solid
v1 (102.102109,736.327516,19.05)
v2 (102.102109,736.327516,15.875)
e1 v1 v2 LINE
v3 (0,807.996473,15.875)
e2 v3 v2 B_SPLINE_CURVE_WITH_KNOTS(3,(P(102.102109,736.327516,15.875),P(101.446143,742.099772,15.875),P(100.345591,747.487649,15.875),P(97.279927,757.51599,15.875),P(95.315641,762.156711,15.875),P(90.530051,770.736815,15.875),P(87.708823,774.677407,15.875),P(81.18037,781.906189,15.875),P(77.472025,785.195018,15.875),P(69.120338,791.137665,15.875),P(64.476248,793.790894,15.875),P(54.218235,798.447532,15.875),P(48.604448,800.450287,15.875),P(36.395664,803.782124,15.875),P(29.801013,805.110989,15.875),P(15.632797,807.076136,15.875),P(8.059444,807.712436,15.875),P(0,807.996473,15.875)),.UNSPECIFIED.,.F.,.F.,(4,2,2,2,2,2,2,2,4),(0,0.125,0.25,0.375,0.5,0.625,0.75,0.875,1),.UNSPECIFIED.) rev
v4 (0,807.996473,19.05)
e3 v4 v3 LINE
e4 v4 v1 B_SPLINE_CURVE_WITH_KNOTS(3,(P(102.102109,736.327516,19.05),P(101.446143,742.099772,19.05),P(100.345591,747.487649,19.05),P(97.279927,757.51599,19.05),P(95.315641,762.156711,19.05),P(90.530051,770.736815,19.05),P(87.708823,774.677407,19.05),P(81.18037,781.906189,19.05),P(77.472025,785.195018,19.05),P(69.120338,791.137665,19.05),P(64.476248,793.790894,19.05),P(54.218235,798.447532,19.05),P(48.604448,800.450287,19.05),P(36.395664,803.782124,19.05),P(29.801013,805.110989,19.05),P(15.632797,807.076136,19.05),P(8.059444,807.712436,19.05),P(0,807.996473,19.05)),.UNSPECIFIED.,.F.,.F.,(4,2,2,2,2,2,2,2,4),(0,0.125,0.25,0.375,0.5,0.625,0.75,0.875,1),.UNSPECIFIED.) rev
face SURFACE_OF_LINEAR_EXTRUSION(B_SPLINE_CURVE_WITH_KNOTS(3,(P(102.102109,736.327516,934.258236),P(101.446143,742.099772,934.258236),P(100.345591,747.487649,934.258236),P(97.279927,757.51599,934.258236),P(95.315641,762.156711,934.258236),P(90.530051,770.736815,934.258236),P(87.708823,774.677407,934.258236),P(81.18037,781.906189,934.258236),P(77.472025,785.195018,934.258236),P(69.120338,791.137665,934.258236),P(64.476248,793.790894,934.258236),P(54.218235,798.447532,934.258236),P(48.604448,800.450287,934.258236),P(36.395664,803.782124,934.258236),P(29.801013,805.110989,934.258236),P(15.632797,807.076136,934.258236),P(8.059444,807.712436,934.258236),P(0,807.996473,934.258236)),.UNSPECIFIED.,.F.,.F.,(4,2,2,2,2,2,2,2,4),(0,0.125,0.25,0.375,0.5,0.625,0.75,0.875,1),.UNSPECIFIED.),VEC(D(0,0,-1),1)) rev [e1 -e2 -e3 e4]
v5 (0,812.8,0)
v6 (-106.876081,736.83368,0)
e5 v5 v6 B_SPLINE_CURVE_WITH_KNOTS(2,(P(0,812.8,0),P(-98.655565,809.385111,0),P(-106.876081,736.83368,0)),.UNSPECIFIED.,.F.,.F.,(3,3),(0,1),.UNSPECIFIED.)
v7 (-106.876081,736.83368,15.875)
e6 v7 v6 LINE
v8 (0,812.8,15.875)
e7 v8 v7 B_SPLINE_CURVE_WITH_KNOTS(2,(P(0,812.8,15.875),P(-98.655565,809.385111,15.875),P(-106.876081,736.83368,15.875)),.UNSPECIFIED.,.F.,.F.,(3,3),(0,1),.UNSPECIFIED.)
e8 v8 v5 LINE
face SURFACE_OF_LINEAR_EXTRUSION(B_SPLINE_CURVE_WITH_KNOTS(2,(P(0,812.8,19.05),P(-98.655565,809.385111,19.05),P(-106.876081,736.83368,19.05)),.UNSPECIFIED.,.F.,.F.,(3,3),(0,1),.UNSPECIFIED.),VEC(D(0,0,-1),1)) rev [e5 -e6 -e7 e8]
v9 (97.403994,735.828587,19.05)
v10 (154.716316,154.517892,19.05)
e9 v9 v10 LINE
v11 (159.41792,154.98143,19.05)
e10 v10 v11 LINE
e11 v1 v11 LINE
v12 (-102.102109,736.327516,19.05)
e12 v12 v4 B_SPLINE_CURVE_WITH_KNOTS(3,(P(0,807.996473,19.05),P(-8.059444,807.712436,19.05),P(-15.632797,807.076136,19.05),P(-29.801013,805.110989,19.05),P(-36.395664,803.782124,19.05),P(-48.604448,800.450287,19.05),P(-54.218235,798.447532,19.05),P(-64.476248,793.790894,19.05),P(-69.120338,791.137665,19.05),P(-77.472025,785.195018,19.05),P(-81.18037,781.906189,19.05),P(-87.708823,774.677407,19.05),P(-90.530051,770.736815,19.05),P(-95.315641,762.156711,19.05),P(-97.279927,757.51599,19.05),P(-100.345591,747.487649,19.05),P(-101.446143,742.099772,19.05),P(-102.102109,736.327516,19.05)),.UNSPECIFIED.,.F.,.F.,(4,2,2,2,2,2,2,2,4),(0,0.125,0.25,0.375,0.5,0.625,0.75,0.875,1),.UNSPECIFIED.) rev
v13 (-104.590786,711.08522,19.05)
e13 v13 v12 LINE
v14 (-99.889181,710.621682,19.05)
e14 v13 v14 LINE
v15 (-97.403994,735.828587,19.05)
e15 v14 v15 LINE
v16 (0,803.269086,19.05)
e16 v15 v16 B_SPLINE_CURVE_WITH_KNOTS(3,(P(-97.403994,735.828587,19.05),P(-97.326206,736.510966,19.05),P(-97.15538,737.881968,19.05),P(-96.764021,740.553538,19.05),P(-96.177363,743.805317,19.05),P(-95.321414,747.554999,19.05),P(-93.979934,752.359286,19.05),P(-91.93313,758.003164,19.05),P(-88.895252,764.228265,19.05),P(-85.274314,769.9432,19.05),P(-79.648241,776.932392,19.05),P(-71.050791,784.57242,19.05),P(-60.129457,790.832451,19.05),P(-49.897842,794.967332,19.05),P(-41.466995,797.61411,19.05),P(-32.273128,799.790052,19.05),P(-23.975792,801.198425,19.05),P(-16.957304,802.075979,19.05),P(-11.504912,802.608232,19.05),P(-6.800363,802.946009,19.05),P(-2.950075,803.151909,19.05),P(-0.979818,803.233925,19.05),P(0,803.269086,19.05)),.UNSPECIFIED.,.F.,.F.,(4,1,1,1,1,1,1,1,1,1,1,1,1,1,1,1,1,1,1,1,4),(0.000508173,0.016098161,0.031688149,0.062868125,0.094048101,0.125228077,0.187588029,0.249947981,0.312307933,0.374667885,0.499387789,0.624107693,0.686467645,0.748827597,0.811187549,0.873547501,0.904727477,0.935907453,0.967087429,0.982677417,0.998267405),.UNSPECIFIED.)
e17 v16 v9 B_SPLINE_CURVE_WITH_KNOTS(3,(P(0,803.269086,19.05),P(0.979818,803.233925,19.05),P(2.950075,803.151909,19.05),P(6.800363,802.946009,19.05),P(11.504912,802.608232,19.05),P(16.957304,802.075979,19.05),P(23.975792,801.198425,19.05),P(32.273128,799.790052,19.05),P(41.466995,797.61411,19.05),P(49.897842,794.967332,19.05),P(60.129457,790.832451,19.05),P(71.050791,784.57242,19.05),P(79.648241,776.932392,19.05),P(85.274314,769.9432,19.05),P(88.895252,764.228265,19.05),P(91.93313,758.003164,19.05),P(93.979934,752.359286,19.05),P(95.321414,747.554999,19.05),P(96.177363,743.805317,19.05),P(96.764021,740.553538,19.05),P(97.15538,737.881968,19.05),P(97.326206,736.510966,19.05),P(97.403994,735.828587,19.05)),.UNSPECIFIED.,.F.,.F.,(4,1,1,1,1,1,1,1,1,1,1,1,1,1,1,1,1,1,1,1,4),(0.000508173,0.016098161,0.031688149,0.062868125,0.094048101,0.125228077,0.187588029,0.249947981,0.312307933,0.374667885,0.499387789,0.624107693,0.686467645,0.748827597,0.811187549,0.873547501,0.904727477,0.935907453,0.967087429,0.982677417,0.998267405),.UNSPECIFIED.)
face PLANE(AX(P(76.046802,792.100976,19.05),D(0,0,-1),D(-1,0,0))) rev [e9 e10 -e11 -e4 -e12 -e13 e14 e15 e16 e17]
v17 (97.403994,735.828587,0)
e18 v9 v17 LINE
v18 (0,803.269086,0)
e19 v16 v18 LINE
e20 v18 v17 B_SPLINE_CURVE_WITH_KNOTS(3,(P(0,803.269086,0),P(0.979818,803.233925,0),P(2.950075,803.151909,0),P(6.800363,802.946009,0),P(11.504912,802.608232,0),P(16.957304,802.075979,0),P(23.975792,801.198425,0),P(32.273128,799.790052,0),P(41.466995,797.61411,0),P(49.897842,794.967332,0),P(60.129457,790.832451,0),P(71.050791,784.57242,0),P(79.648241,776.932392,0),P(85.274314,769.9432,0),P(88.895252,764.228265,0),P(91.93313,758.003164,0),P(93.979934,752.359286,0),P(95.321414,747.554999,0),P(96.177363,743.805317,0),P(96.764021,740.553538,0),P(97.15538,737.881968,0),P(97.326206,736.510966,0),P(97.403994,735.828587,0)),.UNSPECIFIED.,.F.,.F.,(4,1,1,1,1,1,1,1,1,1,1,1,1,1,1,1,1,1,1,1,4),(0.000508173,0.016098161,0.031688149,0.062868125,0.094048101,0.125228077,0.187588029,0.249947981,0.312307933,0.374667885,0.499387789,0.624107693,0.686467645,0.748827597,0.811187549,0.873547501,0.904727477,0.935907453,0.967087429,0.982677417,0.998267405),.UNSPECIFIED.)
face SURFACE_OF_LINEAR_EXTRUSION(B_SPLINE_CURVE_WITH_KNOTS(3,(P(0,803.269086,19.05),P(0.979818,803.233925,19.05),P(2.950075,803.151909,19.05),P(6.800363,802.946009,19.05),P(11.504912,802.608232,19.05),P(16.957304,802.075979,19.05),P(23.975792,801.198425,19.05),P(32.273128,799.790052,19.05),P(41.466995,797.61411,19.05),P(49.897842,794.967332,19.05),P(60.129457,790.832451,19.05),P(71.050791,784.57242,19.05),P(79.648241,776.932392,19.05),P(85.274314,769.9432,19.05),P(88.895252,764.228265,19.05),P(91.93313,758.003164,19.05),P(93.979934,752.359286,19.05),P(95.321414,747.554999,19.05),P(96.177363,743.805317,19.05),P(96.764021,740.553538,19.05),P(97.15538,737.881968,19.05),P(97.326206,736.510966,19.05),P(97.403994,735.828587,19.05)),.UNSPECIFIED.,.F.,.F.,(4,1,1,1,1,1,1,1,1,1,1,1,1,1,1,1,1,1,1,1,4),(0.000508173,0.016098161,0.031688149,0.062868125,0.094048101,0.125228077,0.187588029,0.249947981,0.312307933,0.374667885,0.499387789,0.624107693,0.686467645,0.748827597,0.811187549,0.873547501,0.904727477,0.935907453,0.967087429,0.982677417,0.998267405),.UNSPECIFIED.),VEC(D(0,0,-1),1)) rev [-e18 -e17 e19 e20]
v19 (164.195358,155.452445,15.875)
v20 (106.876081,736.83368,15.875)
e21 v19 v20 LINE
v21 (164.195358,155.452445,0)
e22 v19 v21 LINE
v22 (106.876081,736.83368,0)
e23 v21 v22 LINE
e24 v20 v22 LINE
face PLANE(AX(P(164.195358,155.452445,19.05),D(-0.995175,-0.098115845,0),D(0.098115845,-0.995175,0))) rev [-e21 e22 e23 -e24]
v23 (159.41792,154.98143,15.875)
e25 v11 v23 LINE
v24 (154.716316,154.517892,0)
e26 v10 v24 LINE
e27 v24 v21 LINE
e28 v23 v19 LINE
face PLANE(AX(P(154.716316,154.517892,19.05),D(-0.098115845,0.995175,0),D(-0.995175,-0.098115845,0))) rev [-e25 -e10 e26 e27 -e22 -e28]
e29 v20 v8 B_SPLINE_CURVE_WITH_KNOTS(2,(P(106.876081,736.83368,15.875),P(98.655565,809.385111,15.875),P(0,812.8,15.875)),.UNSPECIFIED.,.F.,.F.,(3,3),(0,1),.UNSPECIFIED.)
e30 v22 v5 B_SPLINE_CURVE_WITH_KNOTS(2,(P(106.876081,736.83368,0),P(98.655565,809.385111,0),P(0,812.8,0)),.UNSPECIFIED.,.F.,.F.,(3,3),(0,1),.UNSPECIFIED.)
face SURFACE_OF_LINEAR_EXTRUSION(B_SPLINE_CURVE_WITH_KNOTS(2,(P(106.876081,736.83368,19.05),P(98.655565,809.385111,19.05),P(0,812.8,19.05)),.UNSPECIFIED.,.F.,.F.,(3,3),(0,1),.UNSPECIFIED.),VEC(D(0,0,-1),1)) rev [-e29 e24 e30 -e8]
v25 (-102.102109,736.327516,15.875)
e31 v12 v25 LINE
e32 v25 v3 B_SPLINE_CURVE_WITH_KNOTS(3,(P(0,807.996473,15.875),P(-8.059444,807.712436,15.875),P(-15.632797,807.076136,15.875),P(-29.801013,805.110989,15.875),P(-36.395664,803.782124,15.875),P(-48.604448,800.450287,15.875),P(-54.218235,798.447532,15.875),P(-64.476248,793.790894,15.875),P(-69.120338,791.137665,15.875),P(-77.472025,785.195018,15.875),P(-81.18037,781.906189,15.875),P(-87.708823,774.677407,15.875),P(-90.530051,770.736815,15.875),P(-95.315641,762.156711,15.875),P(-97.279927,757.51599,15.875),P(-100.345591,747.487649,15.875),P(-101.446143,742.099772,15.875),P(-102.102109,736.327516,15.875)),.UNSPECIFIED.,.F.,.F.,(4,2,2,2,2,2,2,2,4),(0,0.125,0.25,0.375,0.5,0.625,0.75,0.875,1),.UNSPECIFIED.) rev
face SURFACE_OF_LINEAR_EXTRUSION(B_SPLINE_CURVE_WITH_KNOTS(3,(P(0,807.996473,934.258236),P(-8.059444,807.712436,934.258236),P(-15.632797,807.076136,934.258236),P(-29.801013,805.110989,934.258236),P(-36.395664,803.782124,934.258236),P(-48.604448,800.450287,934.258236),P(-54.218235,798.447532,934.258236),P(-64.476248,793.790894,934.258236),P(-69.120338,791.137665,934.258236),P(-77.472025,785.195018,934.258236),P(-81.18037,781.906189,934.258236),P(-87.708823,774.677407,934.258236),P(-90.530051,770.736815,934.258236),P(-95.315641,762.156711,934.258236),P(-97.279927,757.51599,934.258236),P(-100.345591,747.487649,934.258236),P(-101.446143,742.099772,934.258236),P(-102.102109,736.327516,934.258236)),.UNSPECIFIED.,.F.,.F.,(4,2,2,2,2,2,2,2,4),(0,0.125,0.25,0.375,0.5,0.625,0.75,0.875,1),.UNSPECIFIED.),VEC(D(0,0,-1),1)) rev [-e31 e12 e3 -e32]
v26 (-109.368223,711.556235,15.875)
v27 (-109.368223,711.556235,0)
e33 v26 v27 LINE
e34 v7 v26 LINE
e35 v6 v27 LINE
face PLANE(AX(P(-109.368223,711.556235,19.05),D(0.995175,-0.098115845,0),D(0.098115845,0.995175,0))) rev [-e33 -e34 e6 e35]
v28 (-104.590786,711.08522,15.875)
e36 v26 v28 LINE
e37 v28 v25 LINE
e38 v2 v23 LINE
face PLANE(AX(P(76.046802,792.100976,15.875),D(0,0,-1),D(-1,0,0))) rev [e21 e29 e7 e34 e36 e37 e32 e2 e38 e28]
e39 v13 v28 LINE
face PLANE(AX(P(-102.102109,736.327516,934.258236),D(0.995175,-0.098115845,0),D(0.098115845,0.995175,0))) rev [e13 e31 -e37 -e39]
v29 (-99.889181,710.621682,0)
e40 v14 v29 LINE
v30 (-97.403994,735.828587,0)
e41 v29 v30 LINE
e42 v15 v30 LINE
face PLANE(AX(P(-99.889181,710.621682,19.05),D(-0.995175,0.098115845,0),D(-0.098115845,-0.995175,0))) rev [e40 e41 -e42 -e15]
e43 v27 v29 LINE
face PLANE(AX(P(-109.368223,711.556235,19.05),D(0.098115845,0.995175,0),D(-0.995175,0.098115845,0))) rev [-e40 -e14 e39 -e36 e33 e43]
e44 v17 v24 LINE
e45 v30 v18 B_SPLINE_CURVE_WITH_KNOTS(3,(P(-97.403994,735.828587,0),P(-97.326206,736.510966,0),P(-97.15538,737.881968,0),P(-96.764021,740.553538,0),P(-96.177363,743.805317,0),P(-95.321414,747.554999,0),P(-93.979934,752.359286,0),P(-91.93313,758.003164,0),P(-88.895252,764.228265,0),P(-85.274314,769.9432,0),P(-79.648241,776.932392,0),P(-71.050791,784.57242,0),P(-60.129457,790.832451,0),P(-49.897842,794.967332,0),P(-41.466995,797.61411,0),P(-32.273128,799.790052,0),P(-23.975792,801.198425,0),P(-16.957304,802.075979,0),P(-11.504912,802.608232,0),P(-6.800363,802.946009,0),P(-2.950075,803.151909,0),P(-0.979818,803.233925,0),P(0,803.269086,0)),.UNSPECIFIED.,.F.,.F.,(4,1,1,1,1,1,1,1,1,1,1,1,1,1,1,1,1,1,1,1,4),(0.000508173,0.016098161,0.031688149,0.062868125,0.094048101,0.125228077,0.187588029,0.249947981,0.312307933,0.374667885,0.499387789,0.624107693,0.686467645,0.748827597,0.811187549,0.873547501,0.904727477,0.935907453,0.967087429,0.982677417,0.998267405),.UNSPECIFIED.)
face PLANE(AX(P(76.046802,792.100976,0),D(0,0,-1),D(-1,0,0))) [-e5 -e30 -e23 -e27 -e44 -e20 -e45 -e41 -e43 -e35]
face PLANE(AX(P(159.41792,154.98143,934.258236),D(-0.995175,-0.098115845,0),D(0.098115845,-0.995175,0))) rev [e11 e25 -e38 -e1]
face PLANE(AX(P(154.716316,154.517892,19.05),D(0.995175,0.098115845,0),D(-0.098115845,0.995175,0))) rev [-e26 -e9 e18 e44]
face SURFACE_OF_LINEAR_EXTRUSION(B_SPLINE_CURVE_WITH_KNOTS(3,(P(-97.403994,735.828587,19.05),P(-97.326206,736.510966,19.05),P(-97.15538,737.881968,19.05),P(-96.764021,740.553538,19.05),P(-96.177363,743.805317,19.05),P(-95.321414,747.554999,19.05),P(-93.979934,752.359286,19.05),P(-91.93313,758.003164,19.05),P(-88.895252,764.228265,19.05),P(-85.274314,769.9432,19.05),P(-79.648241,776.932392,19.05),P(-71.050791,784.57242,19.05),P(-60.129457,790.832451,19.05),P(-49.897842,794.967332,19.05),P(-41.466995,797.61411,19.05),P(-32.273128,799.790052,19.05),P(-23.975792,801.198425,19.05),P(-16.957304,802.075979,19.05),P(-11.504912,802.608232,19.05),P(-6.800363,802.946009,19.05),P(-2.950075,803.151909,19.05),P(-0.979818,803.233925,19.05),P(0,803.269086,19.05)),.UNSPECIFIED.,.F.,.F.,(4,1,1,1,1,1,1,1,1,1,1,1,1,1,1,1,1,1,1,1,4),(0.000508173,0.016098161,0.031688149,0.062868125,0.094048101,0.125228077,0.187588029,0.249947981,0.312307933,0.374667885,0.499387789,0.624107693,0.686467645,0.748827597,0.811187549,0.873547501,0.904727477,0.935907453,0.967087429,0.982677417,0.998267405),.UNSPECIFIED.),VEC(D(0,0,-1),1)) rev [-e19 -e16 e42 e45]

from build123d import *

# Parameters (mm, degrees)
BOSS_EXTRUDE1_DEPTH = 19.05
CUT_EXTRUDE1_START  = -3.175
CUT_EXTRUDE1_DEPTH  = 3.175


# Read off the part's stored shape, not the designer's step: Cut-Extrude1
with BuildPart() as part:
    # Sketch1 → Boss-Extrude1 (new body)
    with BuildSketch(Plane.XY):
        with BuildLine():
            Line((154.716315659, 154.51789158), (97.403993572, 735.828587024))
            add(Edge.make_bspline(
                [(0, 803.26908628), (0.979817658, 803.233925105), (2.950075123, 803.151909058), (6.800362849, 802.946009068), (11.504912112, 802.608232022), (16.957304332, 802.075979486), (23.975792063, 801.198424891), (32.273128008, 799.790052384), (41.46699497, 797.614109593), (49.89784204, 794.967332344), (60.129456963, 790.832450746), (71.050790712, 784.572420078), (79.648241417, 776.932392043), (85.274313562, 769.943199813), (88.89525226, 764.228265264), (91.933130485, 758.00316425), (93.979934001, 752.359286407), (95.321414001, 747.554999291), (96.177362738, 743.805316844), (96.764020616, 740.553537606), (97.155379667, 737.881968465), (97.326205951, 736.51096636), (97.403993572, 735.828587024)],
                knots=[0.000508173, 0.000508173, 0.000508173, 0.000508173, 0.016098161, 0.031688149, 0.062868125, 0.094048101, 0.125228077, 0.187588029, 0.249947981, 0.312307933, 0.374667885, 0.499387789, 0.624107693, 0.686467645, 0.748827597, 0.811187549, 0.873547501, 0.904727477, 0.935907453, 0.967087429, 0.982677417, 0.998267405, 0.998267405, 0.998267405, 0.998267405], degree=3))
            add(Edge.make_bspline(
                [(-97.403993572, 735.828587024), (-97.326205951, 736.51096636), (-97.155379667, 737.881968465), (-96.764020616, 740.553537606), (-96.177362738, 743.805316844), (-95.321414001, 747.554999291), (-93.979934001, 752.359286407), (-91.933130485, 758.00316425), (-88.89525226, 764.228265264), (-85.274313562, 769.943199813), (-79.648241417, 776.932392043), (-71.050790712, 784.572420078), (-60.129456963, 790.832450746), (-49.89784204, 794.967332344), (-41.46699497, 797.614109593), (-32.273128008, 799.790052384), (-23.975792063, 801.198424891), (-16.957304332, 802.075979486), (-11.504912112, 802.608232022), (-6.800362849, 802.946009068), (-2.950075123, 803.151909058), (-0.979817658, 803.233925105), (0, 803.26908628)],
                knots=[0.000508173, 0.000508173, 0.000508173, 0.000508173, 0.016098161, 0.031688149, 0.062868125, 0.094048101, 0.125228077, 0.187588029, 0.249947981, 0.312307933, 0.374667885, 0.499387789, 0.624107693, 0.686467645, 0.748827597, 0.811187549, 0.873547501, 0.904727477, 0.935907453, 0.967087429, 0.982677417, 0.998267405, 0.998267405, 0.998267405, 0.998267405], degree=3))
            Line((-97.403993572, 735.828587024), (-99.889181424, 710.621681669))
            Line((-99.889181424, 710.621681669), (-109.368223301, 711.556235093))
            Line((-109.368223301, 711.556235093), (-106.876080835, 736.833680097))
            add(Edge.make_bspline(
                [(-106.876080835, 736.833680097), (-98.655564568, 809.385111394), (0, 812.8)],
                knots=[0, 0, 0, 1, 1, 1], degree=2))
            add(Edge.make_bspline(
                [(106.876080835, 736.833680097), (98.655564568, 809.385111394), (0, 812.8)],
                knots=[0, 0, 0, 1, 1, 1], degree=2))
            Line((106.876080835, 736.833680097), (164.195357535, 155.452445004))
            Line((164.195357535, 155.452445004), (154.716315659, 154.51789158))
        make_face()
    extrude(amount=BOSS_EXTRUDE1_DEPTH)

    # Cut-Extrude1 outline → Cut-Extrude1 (cut)
    with BuildSketch(Plane.XY.offset(19.05).offset(CUT_EXTRUDE1_START)):
        with BuildLine():
            add(Edge.make_bspline(
                [(1e-09, 807.996472787), (-8.059444459, 807.712436153), (-15.632797496, 807.076135514), (-29.80101283, 805.110989442), (-36.395663836, 803.782123865), (-48.604448115, 800.45028743), (-54.21823512, 798.447532439), (-64.476247681, 793.79089402), (-69.120337781, 791.137665272), (-77.472024822, 785.195018143), (-81.180369592, 781.906189414), (-87.708823445, 774.677407428), (-90.530051439, 770.736815263), (-95.315640606, 762.156711157), (-97.279926716, 757.51598974), (-100.345590506, 747.487649134), (-101.446143015, 742.099771544), (-102.102109164, 736.327515765)],
                knots=[0, 0, 0, 0, 0.125, 0.125, 0.25, 0.25, 0.375, 0.375, 0.5, 0.5, 0.625, 0.625, 0.75, 0.75, 0.875, 0.875, 1, 1, 1, 1], degree=3))
            add(Edge.make_bspline(
                [(102.102109165, 736.32751576), (101.446143015, 742.099771539), (100.345590507, 747.487649129), (97.279926717, 757.515989736), (95.315640608, 762.156711153), (90.530051441, 770.73681526), (87.708823448, 774.677407425), (81.180369595, 781.906189411), (77.472024825, 785.195018141), (69.120337784, 791.137665271), (64.476247684, 793.790894018), (54.218235123, 798.447532438), (48.604448118, 800.450287429), (36.395663839, 803.782123864), (29.801012833, 805.110989442), (15.632797499, 807.076135513), (8.059444462, 807.712436153), (1e-09, 807.996472787)],
                knots=[0, 0, 0, 0, 0.125, 0.125, 0.25, 0.25, 0.375, 0.375, 0.5, 0.5, 0.625, 0.625, 0.75, 0.75, 0.875, 0.875, 1, 1, 1, 1], degree=3))
            Line((102.102109165, 736.32751576), (159.417920429, 154.981430078))
            Line((159.417920429, 154.981430078), (164.195357535, 155.452445004))
            Line((164.195357535, 155.452445004), (106.876080835, 736.833680097))
            add(Edge.make_bspline(
                [(106.876080835, 736.833680097), (98.655564568, 809.385111394), (0, 812.8)],
                knots=[0, 0, 0, 1, 1, 1], degree=2))
            add(Edge.make_bspline(
                [(0, 812.8), (-98.655564568, 809.385111394), (-106.876080835, 736.833680097)],
                knots=[0, 0, 0, 1, 1, 1], degree=2))
            Line((-106.876080835, 736.833680097), (-109.368223301, 711.556235093))
            Line((-109.368223301, 711.556235093), (-104.590786195, 711.085220167))
            Line((-104.590786195, 711.085220167), (-102.102109164, 736.327515765))
        make_face()
    extrude(amount=CUT_EXTRUDE1_DEPTH, mode=Mode.SUBTRACT)


solid = part.part
